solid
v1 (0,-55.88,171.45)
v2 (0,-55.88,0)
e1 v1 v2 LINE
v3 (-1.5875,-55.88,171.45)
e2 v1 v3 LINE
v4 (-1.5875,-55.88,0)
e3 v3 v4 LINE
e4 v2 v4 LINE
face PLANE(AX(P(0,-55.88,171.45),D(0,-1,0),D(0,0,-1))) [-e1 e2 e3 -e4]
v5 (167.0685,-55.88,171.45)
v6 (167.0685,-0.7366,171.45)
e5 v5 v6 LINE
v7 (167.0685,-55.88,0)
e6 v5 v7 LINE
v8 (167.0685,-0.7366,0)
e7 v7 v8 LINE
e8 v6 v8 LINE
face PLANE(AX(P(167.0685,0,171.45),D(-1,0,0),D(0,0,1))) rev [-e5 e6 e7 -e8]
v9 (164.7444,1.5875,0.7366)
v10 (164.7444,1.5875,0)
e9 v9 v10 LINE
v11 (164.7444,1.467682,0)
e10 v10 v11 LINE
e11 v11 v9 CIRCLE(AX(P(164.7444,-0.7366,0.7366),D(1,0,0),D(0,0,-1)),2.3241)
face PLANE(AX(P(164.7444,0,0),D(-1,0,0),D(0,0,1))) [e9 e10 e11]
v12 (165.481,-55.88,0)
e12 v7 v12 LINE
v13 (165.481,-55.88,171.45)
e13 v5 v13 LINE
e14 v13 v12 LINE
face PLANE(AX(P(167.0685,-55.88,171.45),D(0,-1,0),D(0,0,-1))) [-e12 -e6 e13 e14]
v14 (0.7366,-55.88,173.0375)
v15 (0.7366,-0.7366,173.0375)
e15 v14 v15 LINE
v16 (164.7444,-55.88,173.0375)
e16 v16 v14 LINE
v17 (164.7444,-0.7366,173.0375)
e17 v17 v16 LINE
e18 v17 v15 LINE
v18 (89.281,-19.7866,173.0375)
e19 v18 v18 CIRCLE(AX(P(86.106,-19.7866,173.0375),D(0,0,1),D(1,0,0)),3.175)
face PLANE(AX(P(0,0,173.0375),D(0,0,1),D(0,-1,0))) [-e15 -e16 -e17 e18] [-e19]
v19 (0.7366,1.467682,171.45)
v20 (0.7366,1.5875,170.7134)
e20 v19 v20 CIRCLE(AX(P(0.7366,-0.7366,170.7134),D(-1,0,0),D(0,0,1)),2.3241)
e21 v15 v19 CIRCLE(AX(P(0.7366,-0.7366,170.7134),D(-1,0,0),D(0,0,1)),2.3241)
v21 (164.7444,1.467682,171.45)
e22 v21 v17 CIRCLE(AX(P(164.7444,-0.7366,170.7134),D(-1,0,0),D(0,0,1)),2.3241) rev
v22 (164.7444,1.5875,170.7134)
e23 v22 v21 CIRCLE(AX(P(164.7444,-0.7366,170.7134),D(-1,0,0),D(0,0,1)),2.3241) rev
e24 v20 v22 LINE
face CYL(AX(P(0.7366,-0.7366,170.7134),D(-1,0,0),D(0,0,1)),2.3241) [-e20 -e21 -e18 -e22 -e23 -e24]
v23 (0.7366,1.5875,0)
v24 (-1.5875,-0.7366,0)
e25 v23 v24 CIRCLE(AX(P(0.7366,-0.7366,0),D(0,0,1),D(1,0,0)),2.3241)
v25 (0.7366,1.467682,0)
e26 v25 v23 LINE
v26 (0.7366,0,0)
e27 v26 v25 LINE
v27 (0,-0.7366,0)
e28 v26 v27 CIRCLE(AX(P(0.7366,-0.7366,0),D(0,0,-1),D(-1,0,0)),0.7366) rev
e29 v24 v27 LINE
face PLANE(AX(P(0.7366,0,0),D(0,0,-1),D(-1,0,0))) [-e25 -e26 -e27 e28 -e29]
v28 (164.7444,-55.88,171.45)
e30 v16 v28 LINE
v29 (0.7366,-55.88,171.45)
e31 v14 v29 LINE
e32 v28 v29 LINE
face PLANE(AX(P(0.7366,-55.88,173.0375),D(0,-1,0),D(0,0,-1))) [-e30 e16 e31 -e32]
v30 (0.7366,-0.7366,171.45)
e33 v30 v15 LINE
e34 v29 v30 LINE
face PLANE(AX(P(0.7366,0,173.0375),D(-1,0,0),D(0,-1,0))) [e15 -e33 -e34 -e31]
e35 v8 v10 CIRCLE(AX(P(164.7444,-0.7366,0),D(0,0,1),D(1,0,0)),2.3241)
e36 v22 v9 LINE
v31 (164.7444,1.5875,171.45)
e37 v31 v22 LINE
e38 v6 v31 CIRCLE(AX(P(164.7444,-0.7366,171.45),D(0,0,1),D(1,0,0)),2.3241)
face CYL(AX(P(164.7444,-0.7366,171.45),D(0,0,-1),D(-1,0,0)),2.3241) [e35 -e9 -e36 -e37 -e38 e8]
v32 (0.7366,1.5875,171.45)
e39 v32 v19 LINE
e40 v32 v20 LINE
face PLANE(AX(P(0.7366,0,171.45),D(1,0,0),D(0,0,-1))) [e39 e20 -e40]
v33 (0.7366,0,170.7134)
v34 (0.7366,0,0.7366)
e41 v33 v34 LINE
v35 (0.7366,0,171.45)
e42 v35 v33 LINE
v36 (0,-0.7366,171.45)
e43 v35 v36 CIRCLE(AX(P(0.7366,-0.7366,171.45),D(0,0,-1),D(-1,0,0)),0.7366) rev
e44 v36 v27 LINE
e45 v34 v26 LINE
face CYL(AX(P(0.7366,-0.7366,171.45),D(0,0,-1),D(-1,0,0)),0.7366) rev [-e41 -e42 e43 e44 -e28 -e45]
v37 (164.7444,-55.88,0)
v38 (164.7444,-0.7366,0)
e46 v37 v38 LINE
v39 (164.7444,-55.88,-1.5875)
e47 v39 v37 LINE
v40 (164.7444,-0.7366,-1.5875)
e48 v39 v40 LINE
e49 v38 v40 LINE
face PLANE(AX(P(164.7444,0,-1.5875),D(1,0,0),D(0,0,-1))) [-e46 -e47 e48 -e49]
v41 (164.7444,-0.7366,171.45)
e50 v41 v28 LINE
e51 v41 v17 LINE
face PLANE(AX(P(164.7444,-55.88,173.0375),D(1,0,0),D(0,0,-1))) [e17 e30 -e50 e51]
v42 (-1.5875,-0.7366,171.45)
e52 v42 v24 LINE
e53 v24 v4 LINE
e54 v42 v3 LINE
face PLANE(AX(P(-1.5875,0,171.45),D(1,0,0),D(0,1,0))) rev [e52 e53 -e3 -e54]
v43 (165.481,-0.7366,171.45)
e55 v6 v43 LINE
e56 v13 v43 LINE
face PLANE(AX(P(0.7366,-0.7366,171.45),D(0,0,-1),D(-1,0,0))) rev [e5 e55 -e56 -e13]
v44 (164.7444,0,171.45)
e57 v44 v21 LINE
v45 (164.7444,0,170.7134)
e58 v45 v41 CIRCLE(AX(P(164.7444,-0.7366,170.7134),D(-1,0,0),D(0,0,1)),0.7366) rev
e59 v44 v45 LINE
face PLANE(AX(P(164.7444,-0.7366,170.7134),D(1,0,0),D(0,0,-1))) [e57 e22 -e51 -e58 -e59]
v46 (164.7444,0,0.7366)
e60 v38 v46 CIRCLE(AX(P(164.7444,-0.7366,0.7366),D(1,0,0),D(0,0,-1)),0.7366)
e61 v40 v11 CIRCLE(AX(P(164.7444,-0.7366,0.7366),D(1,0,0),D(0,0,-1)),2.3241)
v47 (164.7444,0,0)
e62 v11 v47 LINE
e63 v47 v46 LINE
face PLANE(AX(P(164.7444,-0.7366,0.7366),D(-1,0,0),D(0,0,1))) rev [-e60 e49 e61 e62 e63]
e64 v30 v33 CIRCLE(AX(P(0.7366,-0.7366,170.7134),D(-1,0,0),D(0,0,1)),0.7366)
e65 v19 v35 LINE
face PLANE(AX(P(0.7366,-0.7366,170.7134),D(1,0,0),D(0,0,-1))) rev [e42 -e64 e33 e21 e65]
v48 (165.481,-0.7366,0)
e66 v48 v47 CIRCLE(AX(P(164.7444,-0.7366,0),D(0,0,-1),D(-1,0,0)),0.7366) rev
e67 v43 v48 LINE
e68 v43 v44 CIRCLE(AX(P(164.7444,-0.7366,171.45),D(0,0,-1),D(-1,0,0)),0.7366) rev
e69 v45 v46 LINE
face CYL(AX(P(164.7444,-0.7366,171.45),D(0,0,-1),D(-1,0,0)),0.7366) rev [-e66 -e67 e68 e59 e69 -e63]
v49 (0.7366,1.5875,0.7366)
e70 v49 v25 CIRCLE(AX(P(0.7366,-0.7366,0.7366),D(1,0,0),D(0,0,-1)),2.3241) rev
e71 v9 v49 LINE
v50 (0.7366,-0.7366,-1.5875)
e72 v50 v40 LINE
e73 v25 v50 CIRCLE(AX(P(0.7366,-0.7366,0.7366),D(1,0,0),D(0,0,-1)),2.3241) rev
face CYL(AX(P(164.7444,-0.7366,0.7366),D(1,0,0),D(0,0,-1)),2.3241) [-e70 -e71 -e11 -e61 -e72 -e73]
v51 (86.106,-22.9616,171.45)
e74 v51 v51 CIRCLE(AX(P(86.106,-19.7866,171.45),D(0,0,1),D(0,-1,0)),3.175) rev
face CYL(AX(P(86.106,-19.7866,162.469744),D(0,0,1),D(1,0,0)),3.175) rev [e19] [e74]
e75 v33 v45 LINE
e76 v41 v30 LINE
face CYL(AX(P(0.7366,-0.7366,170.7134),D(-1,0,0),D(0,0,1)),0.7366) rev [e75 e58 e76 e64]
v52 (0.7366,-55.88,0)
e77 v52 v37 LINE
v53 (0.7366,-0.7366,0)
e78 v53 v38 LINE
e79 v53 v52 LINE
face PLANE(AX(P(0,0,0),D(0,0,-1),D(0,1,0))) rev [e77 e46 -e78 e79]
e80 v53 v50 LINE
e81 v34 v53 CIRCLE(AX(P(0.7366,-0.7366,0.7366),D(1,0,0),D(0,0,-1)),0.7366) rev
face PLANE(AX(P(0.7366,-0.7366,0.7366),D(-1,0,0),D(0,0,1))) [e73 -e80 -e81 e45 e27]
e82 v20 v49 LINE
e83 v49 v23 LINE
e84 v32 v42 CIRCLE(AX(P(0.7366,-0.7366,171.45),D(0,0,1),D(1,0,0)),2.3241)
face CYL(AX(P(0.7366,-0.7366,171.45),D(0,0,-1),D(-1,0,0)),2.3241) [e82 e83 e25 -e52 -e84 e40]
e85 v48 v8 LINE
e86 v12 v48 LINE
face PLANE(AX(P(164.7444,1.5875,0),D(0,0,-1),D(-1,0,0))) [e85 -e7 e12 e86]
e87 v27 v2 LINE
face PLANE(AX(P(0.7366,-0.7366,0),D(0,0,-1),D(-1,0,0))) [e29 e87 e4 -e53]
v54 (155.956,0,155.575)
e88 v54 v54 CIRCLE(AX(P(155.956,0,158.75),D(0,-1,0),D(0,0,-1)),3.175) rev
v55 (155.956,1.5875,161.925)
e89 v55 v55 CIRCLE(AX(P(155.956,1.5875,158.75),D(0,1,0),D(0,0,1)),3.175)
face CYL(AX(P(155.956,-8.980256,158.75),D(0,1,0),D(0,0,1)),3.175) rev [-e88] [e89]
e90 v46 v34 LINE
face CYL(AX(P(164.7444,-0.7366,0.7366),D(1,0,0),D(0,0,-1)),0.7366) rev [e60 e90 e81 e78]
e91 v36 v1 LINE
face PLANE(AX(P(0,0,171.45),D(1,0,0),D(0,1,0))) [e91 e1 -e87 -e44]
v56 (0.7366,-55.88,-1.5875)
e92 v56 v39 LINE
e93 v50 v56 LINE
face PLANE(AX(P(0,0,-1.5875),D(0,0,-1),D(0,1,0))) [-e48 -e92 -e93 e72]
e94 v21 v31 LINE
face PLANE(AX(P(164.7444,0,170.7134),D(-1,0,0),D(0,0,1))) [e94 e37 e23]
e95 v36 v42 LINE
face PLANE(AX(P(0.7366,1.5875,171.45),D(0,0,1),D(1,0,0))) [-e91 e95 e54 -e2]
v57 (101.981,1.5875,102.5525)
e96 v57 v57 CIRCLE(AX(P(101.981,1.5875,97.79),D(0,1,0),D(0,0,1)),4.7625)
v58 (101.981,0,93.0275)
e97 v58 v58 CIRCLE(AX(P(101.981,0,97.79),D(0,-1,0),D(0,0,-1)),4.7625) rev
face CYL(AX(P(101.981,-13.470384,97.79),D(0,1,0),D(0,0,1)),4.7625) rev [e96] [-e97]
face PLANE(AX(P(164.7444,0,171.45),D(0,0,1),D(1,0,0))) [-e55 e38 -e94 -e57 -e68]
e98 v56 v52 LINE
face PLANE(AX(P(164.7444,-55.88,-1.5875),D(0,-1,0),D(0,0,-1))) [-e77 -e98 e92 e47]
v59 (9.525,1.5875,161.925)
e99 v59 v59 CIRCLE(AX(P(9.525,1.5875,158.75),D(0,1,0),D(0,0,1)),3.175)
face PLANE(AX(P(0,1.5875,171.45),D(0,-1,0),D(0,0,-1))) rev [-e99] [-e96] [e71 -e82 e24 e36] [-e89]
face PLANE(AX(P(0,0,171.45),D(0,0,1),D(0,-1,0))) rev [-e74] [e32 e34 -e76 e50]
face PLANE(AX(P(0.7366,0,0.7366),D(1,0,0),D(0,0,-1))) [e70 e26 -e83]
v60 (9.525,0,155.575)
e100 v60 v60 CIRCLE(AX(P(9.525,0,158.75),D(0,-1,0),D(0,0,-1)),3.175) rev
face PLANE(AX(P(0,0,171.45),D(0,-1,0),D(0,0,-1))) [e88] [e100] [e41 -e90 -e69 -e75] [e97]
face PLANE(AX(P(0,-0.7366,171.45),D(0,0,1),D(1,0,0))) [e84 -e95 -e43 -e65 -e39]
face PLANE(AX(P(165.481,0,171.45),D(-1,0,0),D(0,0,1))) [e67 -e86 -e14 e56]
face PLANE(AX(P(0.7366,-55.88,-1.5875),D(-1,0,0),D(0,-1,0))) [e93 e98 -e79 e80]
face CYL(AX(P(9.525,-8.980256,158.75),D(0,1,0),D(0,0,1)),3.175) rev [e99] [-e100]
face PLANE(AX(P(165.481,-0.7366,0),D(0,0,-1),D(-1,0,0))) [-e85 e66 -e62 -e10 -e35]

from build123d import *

# Parameters (mm, degrees)
BASE_FLANGE1_DEPTH           = 171.45
SKETCH4_R                    = 4.7625
CUT_EXTRUDE1_DEPTH           = 1.5875
EDGE_FLANGE2_STRIP_W         = 7.8232
EDGE_FLANGE2_STRIP_H         = 1.5875
EDGE_FLANGE2_STRIP_CUT_DEPTH = 164.0078
EDGE_FLANGE2_DEPTH           = 164.0078
EDGE_FLANGE3_STRIP_W         = 7.8232
EDGE_FLANGE3_STRIP_H         = 1.5875
EDGE_FLANGE3_STRIP_CUT_DEPTH = 164.0078
EDGE_FLANGE3_DEPTH           = 164.0078
SKETCH14_R                   = 3.175
CUT_EXTRUDE2_DEPTH           = 1.5875
SKETCH17_R                   = 3.175
CUT_EXTRUDE5_DEPTH           = 1.5875


# Sheet-metal steps are written as plain solids
with BuildPart() as part:
    # Sketch1 → Base-Flange1 (new body)
    with BuildSketch(Plane.XY):
        with BuildLine():
            Line((0, -55.88), (0, -0.7366))
            ThreePointArc((0, -0.7366), (0.215745145, -0.215745145), (0.7366, 0))
            Line((0.7366, 0), (164.7444, 0))
            ThreePointArc((164.7444, 0), (165.265254855, -0.215745145), (165.481, -0.7366))
            Line((165.481, -0.7366), (165.481, -55.88))
            Line((165.481, -55.88), (167.0685, -55.88))
            Line((167.0685, -55.88), (167.0685, -0.7366))
            ThreePointArc((167.0685, -0.7366), (166.38778687, 0.90678687), (164.7444, 1.5875))
            Line((164.7444, 1.5875), (0.7366, 1.5875))
            ThreePointArc((0.7366, 1.5875), (-0.90678687, 0.90678687), (-1.5875, -0.7366))
            Line((-1.5875, -0.7366), (-1.5875, -55.88))
            Line((-1.5875, -55.88), (0, -55.88))
        make_face()
    extrude(amount=BASE_FLANGE1_DEPTH)

    # Sketch4 → Cut-Extrude1 (cut)
    with BuildSketch(Plane(origin=(0, 1.5875, 0), x_dir=(1, 0, 0), z_dir=(0, 1, 0))):
        with Locations(Location((101.981, -97.79, 0), (0, 0, 270))):
            Circle(SKETCH4_R)
    extrude(amount=-CUT_EXTRUDE1_DEPTH, mode=Mode.SUBTRACT)

    # Edge-Flange2 strip (across the edge) → Edge-Flange2 strip cut (cut)
    with BuildSketch(Plane(origin=(164.7444, 0, 171.45), x_dir=(0, 0, -1), z_dir=(-1, 0, 0))):
        with Locations((-3.175, -0.79375)):
            Rectangle(EDGE_FLANGE2_STRIP_W, EDGE_FLANGE2_STRIP_H)
    extrude(amount=EDGE_FLANGE2_STRIP_CUT_DEPTH, mode=Mode.SUBTRACT)

    # Edge-Flange2 section (across the edge) → Edge-Flange2 (add)
    with BuildSketch(Plane(origin=(164.7444, 0, 171.45), x_dir=(0, 0, -1), z_dir=(-1, 0, 0))):
        with BuildLine():
            Line((-1.5875, 0.7366), (-1.5875, 55.88))
            Line((-1.5875, 55.88), (0, 55.88))
            Line((0, 55.88), (0, 0.7366))
            ThreePointArc((0, 0.7366), (0.215745145, 0.215745145), (0.7366, 0))
            Line((0.7366, 0), (0.7366, -1.5875))
            ThreePointArc((0.7366, -1.5875), (-0.90678687, -0.90678687), (-1.5875, 0.7366))
        make_face()
    extrude(amount=EDGE_FLANGE2_DEPTH)

    # Edge-Flange3 strip (across the edge) → Edge-Flange3 strip cut (cut)
    with BuildSketch(Plane(origin=(0.7366, 0, 0), x_dir=(0, 0, 1), z_dir=(1, 0, 0))):
        with Locations((-3.175, -0.79375)):
            Rectangle(EDGE_FLANGE3_STRIP_W, EDGE_FLANGE3_STRIP_H)
    extrude(amount=EDGE_FLANGE3_STRIP_CUT_DEPTH, mode=Mode.SUBTRACT)

    # Edge-Flange3 section (across the edge) → Edge-Flange3 (add)
    with BuildSketch(Plane(origin=(0.7366, 0, 0), x_dir=(0, 0, 1), z_dir=(1, 0, 0))):
        with BuildLine():
            Line((-1.5875, 0.7366), (-1.5875, 55.88))
            Line((-1.5875, 55.88), (0, 55.88))
            Line((0, 55.88), (0, 0.7366))
            ThreePointArc((0, 0.7366), (0.215745145, 0.215745145), (0.7366, 0))
            Line((0.7366, 0), (0.7366, -1.5875))
            ThreePointArc((0.7366, -1.5875), (-0.90678687, -0.90678687), (-1.5875, 0.7366))
        make_face()
    extrude(amount=EDGE_FLANGE3_DEPTH)

    # Sketch14 → Cut-Extrude2 (cut)
    with BuildSketch(Plane(origin=(0, 1.5875, 0), x_dir=(1, 0, 0), z_dir=(0, 1, 0))):
        with Locations(Location((155.956, -158.75, 0), (0, 0, 270))):
            Circle(SKETCH14_R)
        with Locations(Location((9.525, -158.75, 0), (0, 0, 270))):
            Circle(SKETCH14_R)
    extrude(amount=-CUT_EXTRUDE2_DEPTH, mode=Mode.SUBTRACT)

    # Sketch17 → Cut-Extrude5 (cut)
    with BuildSketch(Plane.XY.offset(173.0375)):
        with Locations((86.106, -19.7866)):
            Circle(SKETCH17_R)
    extrude(amount=-CUT_EXTRUDE5_DEPTH, mode=Mode.SUBTRACT)


solid = part.part
